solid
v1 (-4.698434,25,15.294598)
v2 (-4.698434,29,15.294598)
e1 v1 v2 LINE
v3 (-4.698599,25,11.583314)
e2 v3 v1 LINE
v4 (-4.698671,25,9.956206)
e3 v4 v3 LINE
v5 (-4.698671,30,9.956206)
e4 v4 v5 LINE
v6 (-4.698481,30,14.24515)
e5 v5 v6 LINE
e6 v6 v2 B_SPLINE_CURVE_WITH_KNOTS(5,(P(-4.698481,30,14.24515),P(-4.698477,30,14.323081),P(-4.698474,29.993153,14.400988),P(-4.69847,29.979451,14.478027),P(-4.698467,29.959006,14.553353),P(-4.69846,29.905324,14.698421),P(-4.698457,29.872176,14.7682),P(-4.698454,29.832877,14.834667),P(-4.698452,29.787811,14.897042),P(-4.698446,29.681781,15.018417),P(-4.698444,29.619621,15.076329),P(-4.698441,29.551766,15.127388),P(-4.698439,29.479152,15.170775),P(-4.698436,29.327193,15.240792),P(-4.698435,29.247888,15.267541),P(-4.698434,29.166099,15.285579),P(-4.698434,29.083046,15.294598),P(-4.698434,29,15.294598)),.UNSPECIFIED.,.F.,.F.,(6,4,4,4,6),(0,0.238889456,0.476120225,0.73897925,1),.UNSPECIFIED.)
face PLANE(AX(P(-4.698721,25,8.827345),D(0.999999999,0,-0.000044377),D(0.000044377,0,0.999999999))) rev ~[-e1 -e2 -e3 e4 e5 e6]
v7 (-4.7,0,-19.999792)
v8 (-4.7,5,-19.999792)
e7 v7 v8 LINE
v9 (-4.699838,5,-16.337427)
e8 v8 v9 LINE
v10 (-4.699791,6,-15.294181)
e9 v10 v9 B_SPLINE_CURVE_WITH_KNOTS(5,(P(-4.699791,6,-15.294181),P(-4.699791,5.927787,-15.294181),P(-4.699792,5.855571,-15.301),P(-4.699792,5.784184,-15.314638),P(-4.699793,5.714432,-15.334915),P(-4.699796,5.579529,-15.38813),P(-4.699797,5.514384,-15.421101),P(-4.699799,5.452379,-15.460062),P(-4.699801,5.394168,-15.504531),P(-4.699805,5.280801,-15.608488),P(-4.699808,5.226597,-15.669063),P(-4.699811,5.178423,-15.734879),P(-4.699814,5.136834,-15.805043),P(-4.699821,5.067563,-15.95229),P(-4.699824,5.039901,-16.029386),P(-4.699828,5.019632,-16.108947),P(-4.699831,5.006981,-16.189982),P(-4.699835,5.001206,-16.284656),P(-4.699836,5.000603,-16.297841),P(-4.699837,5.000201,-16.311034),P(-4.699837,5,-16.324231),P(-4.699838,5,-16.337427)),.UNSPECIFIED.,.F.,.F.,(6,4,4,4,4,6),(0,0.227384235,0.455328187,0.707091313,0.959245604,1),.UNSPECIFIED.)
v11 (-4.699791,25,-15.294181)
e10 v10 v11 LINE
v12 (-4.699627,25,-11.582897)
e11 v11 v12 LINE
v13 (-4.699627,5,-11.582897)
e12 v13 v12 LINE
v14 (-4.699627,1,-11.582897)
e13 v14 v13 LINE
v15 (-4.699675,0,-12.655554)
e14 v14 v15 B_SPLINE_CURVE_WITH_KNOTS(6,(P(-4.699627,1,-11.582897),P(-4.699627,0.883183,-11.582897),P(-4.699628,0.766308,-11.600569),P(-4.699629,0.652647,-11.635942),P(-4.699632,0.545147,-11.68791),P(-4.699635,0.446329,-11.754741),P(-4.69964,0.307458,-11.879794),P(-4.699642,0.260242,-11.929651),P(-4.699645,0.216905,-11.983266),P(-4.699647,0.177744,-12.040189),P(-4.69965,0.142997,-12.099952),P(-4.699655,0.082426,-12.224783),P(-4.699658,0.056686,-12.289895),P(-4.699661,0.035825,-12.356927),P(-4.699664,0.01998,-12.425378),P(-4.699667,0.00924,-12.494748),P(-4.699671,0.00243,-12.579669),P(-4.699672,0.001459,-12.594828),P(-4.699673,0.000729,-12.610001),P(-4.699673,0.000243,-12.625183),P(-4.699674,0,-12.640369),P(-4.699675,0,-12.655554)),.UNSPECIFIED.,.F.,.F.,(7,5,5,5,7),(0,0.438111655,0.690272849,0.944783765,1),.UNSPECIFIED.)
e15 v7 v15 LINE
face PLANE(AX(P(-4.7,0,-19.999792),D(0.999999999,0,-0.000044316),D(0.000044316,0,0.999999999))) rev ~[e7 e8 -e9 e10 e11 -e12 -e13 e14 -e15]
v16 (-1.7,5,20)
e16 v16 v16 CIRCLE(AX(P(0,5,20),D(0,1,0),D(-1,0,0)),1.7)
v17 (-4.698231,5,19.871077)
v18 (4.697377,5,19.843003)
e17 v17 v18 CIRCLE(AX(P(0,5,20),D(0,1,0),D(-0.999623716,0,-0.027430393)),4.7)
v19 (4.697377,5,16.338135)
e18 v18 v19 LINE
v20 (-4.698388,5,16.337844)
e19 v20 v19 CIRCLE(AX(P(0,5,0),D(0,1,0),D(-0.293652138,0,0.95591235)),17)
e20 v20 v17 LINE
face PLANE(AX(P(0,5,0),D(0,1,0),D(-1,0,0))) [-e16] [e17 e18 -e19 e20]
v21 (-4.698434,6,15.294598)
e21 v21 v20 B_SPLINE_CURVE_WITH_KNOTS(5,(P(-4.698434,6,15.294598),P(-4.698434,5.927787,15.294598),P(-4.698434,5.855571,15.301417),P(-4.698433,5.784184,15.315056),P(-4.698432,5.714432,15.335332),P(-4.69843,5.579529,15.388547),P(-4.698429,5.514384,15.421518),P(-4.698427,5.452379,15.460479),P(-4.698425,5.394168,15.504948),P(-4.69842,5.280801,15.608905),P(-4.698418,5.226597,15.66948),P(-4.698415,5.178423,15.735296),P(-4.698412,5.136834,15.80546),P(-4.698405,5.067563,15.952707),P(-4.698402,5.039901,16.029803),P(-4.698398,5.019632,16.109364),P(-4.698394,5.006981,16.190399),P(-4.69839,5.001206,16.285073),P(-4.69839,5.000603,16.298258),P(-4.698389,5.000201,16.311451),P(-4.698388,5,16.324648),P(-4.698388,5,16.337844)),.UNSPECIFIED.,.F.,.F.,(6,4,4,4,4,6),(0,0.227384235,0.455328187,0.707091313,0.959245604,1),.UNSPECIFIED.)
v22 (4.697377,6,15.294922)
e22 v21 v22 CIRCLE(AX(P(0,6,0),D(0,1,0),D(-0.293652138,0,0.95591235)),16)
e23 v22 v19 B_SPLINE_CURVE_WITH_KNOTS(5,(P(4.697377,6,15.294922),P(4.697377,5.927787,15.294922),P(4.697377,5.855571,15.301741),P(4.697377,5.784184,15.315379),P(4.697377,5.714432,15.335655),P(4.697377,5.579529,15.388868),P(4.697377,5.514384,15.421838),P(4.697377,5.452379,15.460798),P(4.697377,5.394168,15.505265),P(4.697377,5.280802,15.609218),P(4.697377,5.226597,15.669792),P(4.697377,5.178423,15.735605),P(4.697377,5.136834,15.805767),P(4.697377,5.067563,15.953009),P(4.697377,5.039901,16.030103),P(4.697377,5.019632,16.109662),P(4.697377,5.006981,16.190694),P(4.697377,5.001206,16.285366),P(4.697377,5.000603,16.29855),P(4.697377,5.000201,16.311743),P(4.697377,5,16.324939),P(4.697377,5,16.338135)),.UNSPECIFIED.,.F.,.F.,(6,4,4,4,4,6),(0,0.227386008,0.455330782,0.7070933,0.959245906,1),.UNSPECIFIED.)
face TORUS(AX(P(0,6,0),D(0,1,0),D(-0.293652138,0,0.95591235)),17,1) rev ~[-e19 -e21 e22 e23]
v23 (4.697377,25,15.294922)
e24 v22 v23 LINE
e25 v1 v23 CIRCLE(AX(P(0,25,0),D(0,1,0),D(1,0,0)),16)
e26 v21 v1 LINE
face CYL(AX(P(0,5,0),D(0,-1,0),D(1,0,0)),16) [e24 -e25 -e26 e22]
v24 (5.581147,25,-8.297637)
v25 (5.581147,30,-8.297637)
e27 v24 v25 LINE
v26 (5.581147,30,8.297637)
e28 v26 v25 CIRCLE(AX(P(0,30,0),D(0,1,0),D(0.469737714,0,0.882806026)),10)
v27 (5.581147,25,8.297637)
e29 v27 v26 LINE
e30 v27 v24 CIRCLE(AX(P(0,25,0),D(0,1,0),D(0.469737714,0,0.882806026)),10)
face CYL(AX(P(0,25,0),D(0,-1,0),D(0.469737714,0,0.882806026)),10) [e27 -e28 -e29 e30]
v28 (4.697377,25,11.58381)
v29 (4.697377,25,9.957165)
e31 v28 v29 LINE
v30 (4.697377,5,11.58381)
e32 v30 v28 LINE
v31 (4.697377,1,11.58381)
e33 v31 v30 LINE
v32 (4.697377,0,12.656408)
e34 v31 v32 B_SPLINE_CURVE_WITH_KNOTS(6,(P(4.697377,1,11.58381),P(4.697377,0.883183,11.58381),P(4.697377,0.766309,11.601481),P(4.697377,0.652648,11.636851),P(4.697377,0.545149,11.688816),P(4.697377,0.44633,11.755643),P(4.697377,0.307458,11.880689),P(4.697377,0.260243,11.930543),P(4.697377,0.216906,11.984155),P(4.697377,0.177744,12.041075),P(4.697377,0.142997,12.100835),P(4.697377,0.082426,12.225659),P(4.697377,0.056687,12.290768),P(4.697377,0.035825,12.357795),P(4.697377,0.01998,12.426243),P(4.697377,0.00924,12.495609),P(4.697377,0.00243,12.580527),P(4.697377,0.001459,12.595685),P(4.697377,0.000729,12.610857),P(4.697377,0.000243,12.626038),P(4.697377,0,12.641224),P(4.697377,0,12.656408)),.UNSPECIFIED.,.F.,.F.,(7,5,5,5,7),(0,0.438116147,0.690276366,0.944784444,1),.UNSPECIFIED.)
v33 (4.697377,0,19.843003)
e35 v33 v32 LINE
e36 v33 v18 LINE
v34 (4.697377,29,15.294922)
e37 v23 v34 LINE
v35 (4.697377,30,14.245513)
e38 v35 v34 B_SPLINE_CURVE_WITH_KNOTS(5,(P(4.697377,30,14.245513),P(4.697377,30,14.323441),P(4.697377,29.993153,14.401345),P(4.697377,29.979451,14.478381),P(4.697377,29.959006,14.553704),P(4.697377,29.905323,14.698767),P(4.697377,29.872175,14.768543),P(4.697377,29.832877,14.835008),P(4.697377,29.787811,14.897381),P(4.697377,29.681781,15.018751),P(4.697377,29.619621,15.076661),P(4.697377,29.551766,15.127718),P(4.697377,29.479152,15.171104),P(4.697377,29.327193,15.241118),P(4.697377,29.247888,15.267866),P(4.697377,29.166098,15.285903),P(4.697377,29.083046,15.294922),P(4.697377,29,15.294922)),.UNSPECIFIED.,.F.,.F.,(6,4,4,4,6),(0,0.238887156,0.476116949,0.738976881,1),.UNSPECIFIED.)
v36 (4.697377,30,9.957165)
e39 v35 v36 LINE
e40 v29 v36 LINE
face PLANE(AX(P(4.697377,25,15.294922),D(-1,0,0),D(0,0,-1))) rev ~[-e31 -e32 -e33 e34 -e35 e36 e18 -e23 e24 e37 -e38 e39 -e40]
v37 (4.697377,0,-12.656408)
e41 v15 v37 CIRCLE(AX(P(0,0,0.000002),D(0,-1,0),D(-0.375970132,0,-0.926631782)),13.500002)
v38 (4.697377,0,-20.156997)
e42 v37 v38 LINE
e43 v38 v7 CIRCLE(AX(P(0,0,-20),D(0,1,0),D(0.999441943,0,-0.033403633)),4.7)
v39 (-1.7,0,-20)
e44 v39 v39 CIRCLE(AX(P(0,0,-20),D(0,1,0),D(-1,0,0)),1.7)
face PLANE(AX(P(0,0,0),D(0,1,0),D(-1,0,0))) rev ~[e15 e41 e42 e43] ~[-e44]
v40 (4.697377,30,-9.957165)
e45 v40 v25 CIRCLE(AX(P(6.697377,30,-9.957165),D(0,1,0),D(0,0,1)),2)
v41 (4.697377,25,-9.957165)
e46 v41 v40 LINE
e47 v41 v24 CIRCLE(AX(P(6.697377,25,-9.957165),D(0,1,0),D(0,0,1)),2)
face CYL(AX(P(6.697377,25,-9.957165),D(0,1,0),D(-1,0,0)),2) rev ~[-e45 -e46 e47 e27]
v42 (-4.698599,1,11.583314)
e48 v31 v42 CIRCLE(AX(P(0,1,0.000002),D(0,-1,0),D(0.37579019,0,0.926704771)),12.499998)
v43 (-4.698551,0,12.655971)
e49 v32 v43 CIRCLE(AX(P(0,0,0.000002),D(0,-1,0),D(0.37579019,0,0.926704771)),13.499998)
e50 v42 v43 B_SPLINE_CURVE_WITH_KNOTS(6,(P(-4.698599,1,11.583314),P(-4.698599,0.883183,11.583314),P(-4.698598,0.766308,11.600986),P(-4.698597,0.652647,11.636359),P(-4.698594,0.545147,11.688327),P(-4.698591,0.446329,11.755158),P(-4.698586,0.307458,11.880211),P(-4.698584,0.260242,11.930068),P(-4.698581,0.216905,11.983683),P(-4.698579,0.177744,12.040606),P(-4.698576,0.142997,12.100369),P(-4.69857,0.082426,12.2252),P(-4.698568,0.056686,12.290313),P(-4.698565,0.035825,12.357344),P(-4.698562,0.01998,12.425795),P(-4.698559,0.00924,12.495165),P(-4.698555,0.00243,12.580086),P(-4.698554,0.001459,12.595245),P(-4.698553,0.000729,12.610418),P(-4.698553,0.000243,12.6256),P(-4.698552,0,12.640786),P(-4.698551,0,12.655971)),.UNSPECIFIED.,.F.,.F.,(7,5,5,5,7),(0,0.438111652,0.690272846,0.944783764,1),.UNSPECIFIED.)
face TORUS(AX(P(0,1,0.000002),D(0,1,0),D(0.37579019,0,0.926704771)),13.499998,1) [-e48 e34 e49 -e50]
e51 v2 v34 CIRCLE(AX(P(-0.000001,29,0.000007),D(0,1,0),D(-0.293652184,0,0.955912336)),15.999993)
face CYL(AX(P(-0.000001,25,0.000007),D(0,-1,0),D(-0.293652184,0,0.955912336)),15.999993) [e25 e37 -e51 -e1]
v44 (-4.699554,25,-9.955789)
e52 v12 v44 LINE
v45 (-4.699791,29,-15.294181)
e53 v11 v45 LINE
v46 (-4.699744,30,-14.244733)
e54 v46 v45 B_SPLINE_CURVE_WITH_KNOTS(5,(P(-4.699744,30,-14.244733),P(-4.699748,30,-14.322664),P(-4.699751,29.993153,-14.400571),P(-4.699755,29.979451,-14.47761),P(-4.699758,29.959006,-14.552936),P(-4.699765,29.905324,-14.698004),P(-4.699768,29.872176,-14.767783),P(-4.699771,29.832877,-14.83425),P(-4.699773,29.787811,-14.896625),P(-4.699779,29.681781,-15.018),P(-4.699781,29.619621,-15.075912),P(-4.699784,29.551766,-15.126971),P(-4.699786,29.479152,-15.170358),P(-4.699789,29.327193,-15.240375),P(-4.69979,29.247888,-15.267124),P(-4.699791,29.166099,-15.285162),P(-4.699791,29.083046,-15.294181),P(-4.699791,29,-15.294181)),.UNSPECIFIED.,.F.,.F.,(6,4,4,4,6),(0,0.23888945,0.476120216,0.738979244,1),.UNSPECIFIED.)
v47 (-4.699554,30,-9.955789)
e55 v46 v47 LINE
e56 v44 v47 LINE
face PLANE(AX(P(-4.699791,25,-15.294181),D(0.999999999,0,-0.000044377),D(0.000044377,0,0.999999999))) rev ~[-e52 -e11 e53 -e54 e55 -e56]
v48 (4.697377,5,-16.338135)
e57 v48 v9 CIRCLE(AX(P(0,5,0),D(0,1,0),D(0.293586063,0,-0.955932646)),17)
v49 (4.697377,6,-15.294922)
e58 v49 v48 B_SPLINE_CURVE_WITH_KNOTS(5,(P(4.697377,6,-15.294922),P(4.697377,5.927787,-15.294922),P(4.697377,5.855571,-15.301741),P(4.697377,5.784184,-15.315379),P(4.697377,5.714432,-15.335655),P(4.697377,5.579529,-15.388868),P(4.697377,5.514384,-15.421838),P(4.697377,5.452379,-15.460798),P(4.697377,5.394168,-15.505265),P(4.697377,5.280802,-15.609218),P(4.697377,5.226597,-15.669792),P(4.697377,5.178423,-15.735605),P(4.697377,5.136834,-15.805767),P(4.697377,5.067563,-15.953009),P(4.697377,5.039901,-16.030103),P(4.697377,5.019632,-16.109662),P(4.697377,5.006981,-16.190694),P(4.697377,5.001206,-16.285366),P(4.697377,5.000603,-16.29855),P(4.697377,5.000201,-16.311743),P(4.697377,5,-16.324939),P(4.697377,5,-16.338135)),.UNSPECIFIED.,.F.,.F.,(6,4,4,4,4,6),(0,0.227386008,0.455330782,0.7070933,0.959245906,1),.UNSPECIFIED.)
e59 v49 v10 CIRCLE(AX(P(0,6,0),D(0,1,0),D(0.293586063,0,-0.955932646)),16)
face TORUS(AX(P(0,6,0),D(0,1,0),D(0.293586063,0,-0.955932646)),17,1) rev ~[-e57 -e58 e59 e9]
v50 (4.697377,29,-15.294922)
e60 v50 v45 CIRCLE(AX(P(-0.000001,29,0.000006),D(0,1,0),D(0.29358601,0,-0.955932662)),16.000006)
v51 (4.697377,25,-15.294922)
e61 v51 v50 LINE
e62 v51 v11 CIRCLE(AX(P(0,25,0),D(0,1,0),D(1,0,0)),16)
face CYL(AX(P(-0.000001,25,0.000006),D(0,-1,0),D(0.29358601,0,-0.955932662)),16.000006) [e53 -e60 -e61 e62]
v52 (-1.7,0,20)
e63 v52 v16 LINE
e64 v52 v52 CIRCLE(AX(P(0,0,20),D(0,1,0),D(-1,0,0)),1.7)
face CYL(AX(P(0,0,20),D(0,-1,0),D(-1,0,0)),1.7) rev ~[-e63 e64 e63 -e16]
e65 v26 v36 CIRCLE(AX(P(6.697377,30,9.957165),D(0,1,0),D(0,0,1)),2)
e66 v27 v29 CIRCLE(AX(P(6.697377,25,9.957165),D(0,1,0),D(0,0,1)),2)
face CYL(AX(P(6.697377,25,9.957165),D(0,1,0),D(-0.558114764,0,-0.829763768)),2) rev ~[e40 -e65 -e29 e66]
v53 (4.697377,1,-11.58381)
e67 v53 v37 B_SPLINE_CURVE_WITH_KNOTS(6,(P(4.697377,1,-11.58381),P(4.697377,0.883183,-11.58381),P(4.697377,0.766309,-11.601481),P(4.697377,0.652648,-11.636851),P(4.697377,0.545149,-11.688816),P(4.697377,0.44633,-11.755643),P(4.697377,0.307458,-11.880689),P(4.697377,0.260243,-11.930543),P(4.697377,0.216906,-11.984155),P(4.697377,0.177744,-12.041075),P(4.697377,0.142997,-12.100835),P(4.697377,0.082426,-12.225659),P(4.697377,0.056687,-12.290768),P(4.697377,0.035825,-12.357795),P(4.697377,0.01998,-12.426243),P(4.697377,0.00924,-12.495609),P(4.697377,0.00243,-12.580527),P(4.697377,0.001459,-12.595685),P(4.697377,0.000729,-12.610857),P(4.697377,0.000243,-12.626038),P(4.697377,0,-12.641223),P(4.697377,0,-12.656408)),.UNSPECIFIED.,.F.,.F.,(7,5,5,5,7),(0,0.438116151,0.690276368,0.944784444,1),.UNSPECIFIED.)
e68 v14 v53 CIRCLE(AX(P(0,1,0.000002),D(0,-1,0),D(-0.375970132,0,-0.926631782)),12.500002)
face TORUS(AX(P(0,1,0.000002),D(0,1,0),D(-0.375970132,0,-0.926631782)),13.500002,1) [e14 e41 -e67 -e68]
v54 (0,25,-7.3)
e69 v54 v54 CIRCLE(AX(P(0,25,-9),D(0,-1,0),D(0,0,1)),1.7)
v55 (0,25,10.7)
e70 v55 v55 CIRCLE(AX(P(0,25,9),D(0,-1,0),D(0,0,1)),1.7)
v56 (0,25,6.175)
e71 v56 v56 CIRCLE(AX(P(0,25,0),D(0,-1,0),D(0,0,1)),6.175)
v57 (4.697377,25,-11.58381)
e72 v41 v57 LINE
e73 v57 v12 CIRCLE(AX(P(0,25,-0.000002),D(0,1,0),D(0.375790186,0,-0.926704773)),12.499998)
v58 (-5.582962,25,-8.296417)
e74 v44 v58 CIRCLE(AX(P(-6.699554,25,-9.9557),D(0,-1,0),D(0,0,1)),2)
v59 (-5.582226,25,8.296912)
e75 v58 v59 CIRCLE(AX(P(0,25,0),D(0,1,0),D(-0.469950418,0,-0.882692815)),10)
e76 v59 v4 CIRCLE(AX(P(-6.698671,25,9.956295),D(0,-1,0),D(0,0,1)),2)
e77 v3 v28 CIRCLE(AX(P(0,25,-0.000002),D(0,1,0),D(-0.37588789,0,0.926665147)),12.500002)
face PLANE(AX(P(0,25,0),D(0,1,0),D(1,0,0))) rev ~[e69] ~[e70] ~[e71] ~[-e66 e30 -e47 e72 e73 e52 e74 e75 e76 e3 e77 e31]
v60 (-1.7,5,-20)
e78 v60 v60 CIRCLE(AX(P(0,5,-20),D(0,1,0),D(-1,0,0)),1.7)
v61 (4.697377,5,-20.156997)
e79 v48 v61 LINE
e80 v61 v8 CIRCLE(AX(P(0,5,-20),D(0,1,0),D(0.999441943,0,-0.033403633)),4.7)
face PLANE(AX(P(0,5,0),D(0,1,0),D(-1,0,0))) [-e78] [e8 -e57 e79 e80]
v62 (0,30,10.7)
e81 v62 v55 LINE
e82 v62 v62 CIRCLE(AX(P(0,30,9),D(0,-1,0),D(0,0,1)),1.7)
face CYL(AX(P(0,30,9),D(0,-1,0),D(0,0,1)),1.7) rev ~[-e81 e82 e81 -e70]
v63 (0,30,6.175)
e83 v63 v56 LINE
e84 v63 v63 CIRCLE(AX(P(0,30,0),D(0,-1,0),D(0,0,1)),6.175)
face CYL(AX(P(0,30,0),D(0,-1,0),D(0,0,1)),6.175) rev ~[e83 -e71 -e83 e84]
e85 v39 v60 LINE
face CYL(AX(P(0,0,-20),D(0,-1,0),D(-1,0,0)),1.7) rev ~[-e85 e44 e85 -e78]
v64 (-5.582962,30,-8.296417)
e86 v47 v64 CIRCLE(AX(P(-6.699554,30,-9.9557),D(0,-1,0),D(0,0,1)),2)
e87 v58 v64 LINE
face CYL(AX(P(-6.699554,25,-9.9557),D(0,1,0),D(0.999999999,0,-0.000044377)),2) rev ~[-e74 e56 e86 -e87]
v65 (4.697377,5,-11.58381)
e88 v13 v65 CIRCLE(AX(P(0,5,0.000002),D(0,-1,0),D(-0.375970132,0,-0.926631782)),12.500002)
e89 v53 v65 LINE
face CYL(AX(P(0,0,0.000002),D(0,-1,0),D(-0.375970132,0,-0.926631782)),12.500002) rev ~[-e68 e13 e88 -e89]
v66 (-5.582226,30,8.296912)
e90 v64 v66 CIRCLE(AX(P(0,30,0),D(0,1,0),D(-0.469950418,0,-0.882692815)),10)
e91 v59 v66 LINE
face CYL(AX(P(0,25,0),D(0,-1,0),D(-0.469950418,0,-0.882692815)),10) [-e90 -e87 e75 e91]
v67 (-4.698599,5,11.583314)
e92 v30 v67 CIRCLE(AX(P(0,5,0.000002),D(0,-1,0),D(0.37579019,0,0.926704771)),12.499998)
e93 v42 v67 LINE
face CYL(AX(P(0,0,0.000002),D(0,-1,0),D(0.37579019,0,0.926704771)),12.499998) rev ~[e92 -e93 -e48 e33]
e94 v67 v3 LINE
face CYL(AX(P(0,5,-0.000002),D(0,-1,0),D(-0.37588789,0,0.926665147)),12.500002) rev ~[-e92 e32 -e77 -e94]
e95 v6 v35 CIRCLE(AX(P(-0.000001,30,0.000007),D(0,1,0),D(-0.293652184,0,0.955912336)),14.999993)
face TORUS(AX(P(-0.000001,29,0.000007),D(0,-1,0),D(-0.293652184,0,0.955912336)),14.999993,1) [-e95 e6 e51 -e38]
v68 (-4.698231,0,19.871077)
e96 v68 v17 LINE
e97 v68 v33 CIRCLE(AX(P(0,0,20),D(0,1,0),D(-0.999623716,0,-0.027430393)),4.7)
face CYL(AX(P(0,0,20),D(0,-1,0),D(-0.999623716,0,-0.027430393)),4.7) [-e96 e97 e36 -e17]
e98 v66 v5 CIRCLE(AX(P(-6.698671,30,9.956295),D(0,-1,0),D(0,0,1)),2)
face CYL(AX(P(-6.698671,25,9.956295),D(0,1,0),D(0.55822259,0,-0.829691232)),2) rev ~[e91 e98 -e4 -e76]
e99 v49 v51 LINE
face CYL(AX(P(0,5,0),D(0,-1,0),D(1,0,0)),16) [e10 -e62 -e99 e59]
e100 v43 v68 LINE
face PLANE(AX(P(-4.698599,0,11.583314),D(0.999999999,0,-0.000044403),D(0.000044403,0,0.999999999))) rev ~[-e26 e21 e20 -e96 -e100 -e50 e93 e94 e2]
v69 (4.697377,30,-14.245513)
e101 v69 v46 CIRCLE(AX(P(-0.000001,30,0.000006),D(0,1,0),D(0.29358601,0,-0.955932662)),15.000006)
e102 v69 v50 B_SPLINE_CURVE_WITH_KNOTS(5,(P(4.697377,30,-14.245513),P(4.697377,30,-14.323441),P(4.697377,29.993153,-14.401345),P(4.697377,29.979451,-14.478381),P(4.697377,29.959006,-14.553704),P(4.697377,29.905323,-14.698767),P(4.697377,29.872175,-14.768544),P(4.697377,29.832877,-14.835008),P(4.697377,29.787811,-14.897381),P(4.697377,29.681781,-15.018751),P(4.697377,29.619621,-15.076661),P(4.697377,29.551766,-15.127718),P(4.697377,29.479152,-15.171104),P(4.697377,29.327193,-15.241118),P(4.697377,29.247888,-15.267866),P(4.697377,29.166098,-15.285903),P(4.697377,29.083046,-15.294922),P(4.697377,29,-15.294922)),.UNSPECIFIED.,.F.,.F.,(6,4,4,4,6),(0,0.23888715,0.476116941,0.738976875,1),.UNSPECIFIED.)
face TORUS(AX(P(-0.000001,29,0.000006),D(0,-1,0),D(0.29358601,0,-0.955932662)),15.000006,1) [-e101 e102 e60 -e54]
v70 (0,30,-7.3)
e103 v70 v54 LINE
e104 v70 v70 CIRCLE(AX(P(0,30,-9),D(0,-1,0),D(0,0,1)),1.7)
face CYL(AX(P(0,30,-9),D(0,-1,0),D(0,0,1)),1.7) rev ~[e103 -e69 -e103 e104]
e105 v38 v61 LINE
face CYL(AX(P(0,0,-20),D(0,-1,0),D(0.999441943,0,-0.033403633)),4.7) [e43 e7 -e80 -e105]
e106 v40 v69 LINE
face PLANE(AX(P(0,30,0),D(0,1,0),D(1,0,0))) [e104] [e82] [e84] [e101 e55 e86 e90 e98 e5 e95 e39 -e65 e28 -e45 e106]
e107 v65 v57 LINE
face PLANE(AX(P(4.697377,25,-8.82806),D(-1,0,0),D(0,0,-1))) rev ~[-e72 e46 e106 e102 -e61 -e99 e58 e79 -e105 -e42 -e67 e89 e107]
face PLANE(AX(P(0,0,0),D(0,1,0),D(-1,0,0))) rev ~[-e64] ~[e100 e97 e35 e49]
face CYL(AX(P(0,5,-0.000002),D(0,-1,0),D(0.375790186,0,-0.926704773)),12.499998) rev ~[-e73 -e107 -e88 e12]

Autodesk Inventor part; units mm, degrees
ref_plane "YZ Plane" through (0, 0, 0) normal (1, 0, 0) x (0, 1, 0)
ref_plane "XZ Plane" through (0, 0, 0) normal (0, 1, 0) x (-1, 0, 0)
ref_plane "XY Plane" through (0, 0, 0) normal (0, 0, 1) x (1, 0, 0)
sketch "スケッチ1" plane through (0, 0, 0) normal (0, 1, 0) x (-1, 0, 0)
  line L0 (0, 0) -> (0, -20) construction
  line L1 (0, 0) -> (0, 20) construction
  circle A0 centre (0, 20) radius 1.7
  circle A1 centre (0, -20) radius 1.7
  circle A2 centre (0, 20) radius 4.7
  circle A3 centre (0, -20) radius 4.7
  line L2 (4.698231, 19.871077) -> (4.7, -19.999792)
  line L3 (-4.697377, 19.843003) -> (-4.697377, -20.156997)
  circle A4 centre (0, 0) radius 12.5
  point P0 (-4.697377, 11.58381)
  point P1 (4.698599, 11.583314)
  point P2 (4.699627, -11.582897)
  point P3 (-4.697377, -11.58381)
  dimension "d0" = 20
  dimension "d1" = 20
  dimension "d2" = 3.4
  dimension "d3" = 3.4
  dimension "d5" = 3
  dimension "d6" = 3
  dimension "d7" = 25
sketch "スケッチ1 outline for 押し出し1" plane through (0, 0, 0) normal (0, 1, 0) x (-1, 0, 0)
  arc A0 (-4.697377, 11.58381) -> (4.698599, 11.583314) centre (0, 0) cw
  line L0 (-4.697377, 19.843003) -> (-4.697377, 11.58381)
  line L1 (4.698599, 11.583314) -> (4.698231, 19.871077)
  arc A1 (4.698231, 19.871077) -> (-4.697377, 19.843003) centre (0, 20) ccw
  circle A2 centre (0, 20) radius 1.7
  arc A3 (-4.697377, -20.156997) -> (4.7, -19.999792) centre (0, -20) ccw
  line L2 (-4.697377, -11.58381) -> (-4.697377, -20.156997)
  line L3 (4.7, -19.999792) -> (4.699627, -11.582897)
  arc A4 (4.699627, -11.582897) -> (-4.697377, -11.58381) centre (0, 0) cw
  circle A5 centre (0, -20) radius 1.7
extrude "押し出し1" add sketch "スケッチ1 outline for 押し出し1" along normal blind 5
sketch "スケッチ2" plane through (0, 5, 0) normal (0, 1, 0) x (1, 0, 0)
  line L0 (-4.698599, -11.583314) -> (-4.698231, -19.871077)
  arc A0 (-4.698231, -19.871077) -> (4.697377, -19.843003) centre (0, -20) ccw
  line L1 (4.697377, -19.843003) -> (4.697377, -11.58381)
  arc A1 (-4.698599, -11.583314) -> (4.697377, -11.58381) centre (0, 0) ccw
  circle A2 centre (0, -20) radius 1.7
  arc A3 (4.697377, 20.156997) -> (-4.7, 19.999792) centre (0, 20) ccw
  line L2 (-4.7, 19.999792) -> (-4.699627, 11.582897)
  arc A4 (4.697377, 11.58381) -> (-4.699627, 11.582897) centre (0, 0) ccw
  line L3 (4.697377, 11.58381) -> (4.697377, 20.156997)
  circle A5 centre (0, 20) radius 1.7
  circle A6 centre (0, 0) radius 16
  point P0 (4.697377, 15.294922)
  point P1 (-4.699791, 15.294181)
  point P2 (-4.698434, -15.294598)
  point P3 (4.697377, -15.294922)
  dimension "d10" = 32
extrude "押し出し2" add sketch "スケッチ2" along normal blind 20 contours A1 L1 A6 L0 | A6 L3 A4 L2
sketch "スケッチ3" plane through (0, 25, 0) normal (0, 1, 0) x (1, 0, 0)
  line L0 (-4.698599, -11.583314) -> (-4.698434, -15.294598)
  arc A0 (-4.698434, -15.294598) -> (4.697377, -15.294922) centre (0, 0) ccw
  line L1 (4.697377, -15.294922) -> (4.697377, -11.58381)
  arc A1 (-4.698599, -11.583314) -> (4.697377, -11.58381) centre (0, 0) ccw
  line L2 (-4.699791, 15.294181) -> (-4.699627, 11.582897)
  arc A2 (4.697377, 11.58381) -> (-4.699627, 11.582897) centre (0, 0) ccw
  line L3 (4.697377, 11.58381) -> (4.697377, 15.294922)
  arc A3 (4.697377, 15.294922) -> (-4.699791, 15.294181) centre (0, 0) ccw
  line L4 (-4.6, -11.583314) -> (-4.6, 11.582897)
  line L5 (4.697377, -11.58381) -> (4.697377, 11.58381)
  circle A4 centre (0, 0) radius 10
  point P0 (-4.699504, 8.826928)
  point P1 (-4.698721, -8.827345)
  point P2 (4.697377, -8.82806)
  point P3 (4.697377, 8.82806)
  dimension "d16" = 20
sketch "スケッチ3 outline for 押し出し3" plane through (0, 25, 0) normal (0, 1, 0) x (1, 0, 0)
  arc A0 (4.697377, 15.294922) -> (-4.699791, 15.294181) centre (0, 0) ccw
  line L0 (-4.699791, 15.294181) -> (-4.699504, 8.826928)
  arc A1 (-4.699504, 8.826928) -> (-4.698721, -8.827345) centre (0, 0) ccw
  line L1 (-4.698721, -8.827345) -> (-4.698434, -15.294598)
  arc A2 (-4.698434, -15.294598) -> (4.697377, -15.294922) centre (0, 0) ccw
  line L2 (4.697377, -15.294922) -> (4.697377, -8.82806)
  arc A3 (4.697377, -8.82806) -> (4.697377, 8.82806) centre (0, 0) ccw
  line L3 (4.697377, 8.82806) -> (4.697377, 15.294922)
extrude "押し出し3" add sketch "スケッチ3 outline for 押し出し3" along normal blind 5
sketch "スケッチ5" plane through (0, 30, 0) normal (0, 1, 0) x (1, 0, 0)
  circle A0 centre (0, 0) radius 6
  line L0 (0, 0) -> (0, 9)
  line L1 (0, 9) -> (0, -9)
  dimension "d18" = 12
  dimension "d19" = 9
  dimension "d20" = 18
hole "穴1" at (0, 30, -9) at (0, 30, 9) direction (0, -1, 0) diameter 3.4 end through all
sketch "スケッチ6" plane through (0, 30, 0) normal (0, 1, 0) x (1, 0, 0)
  point P0 (0, 0)
  point P1 (0, 0)
hole "穴2" at (0, 30, 0) direction (0, -1, 0) diameter 12.35 end through all
fillet "フィレット3" radius 2 4 edges at (-4.6987, 27.5, 8.8273) (-4.6995, 27.5, -8.8269) (4.6974, 27.5, 8.8281) (4.6974, 27.5, -8.8281)
fillet "フィレット4" radius 1 6 edges at (-0.0006, 30, 16) (-0.0013, 30, -16) (-0.0007, 0, 12.5) (-0.0012, 0, -12.5) (-0.0006, 5, 16) (-0.0013, 5, -16)
properties part number "Th_3D_hn_1" material "ABS プラスチック"
